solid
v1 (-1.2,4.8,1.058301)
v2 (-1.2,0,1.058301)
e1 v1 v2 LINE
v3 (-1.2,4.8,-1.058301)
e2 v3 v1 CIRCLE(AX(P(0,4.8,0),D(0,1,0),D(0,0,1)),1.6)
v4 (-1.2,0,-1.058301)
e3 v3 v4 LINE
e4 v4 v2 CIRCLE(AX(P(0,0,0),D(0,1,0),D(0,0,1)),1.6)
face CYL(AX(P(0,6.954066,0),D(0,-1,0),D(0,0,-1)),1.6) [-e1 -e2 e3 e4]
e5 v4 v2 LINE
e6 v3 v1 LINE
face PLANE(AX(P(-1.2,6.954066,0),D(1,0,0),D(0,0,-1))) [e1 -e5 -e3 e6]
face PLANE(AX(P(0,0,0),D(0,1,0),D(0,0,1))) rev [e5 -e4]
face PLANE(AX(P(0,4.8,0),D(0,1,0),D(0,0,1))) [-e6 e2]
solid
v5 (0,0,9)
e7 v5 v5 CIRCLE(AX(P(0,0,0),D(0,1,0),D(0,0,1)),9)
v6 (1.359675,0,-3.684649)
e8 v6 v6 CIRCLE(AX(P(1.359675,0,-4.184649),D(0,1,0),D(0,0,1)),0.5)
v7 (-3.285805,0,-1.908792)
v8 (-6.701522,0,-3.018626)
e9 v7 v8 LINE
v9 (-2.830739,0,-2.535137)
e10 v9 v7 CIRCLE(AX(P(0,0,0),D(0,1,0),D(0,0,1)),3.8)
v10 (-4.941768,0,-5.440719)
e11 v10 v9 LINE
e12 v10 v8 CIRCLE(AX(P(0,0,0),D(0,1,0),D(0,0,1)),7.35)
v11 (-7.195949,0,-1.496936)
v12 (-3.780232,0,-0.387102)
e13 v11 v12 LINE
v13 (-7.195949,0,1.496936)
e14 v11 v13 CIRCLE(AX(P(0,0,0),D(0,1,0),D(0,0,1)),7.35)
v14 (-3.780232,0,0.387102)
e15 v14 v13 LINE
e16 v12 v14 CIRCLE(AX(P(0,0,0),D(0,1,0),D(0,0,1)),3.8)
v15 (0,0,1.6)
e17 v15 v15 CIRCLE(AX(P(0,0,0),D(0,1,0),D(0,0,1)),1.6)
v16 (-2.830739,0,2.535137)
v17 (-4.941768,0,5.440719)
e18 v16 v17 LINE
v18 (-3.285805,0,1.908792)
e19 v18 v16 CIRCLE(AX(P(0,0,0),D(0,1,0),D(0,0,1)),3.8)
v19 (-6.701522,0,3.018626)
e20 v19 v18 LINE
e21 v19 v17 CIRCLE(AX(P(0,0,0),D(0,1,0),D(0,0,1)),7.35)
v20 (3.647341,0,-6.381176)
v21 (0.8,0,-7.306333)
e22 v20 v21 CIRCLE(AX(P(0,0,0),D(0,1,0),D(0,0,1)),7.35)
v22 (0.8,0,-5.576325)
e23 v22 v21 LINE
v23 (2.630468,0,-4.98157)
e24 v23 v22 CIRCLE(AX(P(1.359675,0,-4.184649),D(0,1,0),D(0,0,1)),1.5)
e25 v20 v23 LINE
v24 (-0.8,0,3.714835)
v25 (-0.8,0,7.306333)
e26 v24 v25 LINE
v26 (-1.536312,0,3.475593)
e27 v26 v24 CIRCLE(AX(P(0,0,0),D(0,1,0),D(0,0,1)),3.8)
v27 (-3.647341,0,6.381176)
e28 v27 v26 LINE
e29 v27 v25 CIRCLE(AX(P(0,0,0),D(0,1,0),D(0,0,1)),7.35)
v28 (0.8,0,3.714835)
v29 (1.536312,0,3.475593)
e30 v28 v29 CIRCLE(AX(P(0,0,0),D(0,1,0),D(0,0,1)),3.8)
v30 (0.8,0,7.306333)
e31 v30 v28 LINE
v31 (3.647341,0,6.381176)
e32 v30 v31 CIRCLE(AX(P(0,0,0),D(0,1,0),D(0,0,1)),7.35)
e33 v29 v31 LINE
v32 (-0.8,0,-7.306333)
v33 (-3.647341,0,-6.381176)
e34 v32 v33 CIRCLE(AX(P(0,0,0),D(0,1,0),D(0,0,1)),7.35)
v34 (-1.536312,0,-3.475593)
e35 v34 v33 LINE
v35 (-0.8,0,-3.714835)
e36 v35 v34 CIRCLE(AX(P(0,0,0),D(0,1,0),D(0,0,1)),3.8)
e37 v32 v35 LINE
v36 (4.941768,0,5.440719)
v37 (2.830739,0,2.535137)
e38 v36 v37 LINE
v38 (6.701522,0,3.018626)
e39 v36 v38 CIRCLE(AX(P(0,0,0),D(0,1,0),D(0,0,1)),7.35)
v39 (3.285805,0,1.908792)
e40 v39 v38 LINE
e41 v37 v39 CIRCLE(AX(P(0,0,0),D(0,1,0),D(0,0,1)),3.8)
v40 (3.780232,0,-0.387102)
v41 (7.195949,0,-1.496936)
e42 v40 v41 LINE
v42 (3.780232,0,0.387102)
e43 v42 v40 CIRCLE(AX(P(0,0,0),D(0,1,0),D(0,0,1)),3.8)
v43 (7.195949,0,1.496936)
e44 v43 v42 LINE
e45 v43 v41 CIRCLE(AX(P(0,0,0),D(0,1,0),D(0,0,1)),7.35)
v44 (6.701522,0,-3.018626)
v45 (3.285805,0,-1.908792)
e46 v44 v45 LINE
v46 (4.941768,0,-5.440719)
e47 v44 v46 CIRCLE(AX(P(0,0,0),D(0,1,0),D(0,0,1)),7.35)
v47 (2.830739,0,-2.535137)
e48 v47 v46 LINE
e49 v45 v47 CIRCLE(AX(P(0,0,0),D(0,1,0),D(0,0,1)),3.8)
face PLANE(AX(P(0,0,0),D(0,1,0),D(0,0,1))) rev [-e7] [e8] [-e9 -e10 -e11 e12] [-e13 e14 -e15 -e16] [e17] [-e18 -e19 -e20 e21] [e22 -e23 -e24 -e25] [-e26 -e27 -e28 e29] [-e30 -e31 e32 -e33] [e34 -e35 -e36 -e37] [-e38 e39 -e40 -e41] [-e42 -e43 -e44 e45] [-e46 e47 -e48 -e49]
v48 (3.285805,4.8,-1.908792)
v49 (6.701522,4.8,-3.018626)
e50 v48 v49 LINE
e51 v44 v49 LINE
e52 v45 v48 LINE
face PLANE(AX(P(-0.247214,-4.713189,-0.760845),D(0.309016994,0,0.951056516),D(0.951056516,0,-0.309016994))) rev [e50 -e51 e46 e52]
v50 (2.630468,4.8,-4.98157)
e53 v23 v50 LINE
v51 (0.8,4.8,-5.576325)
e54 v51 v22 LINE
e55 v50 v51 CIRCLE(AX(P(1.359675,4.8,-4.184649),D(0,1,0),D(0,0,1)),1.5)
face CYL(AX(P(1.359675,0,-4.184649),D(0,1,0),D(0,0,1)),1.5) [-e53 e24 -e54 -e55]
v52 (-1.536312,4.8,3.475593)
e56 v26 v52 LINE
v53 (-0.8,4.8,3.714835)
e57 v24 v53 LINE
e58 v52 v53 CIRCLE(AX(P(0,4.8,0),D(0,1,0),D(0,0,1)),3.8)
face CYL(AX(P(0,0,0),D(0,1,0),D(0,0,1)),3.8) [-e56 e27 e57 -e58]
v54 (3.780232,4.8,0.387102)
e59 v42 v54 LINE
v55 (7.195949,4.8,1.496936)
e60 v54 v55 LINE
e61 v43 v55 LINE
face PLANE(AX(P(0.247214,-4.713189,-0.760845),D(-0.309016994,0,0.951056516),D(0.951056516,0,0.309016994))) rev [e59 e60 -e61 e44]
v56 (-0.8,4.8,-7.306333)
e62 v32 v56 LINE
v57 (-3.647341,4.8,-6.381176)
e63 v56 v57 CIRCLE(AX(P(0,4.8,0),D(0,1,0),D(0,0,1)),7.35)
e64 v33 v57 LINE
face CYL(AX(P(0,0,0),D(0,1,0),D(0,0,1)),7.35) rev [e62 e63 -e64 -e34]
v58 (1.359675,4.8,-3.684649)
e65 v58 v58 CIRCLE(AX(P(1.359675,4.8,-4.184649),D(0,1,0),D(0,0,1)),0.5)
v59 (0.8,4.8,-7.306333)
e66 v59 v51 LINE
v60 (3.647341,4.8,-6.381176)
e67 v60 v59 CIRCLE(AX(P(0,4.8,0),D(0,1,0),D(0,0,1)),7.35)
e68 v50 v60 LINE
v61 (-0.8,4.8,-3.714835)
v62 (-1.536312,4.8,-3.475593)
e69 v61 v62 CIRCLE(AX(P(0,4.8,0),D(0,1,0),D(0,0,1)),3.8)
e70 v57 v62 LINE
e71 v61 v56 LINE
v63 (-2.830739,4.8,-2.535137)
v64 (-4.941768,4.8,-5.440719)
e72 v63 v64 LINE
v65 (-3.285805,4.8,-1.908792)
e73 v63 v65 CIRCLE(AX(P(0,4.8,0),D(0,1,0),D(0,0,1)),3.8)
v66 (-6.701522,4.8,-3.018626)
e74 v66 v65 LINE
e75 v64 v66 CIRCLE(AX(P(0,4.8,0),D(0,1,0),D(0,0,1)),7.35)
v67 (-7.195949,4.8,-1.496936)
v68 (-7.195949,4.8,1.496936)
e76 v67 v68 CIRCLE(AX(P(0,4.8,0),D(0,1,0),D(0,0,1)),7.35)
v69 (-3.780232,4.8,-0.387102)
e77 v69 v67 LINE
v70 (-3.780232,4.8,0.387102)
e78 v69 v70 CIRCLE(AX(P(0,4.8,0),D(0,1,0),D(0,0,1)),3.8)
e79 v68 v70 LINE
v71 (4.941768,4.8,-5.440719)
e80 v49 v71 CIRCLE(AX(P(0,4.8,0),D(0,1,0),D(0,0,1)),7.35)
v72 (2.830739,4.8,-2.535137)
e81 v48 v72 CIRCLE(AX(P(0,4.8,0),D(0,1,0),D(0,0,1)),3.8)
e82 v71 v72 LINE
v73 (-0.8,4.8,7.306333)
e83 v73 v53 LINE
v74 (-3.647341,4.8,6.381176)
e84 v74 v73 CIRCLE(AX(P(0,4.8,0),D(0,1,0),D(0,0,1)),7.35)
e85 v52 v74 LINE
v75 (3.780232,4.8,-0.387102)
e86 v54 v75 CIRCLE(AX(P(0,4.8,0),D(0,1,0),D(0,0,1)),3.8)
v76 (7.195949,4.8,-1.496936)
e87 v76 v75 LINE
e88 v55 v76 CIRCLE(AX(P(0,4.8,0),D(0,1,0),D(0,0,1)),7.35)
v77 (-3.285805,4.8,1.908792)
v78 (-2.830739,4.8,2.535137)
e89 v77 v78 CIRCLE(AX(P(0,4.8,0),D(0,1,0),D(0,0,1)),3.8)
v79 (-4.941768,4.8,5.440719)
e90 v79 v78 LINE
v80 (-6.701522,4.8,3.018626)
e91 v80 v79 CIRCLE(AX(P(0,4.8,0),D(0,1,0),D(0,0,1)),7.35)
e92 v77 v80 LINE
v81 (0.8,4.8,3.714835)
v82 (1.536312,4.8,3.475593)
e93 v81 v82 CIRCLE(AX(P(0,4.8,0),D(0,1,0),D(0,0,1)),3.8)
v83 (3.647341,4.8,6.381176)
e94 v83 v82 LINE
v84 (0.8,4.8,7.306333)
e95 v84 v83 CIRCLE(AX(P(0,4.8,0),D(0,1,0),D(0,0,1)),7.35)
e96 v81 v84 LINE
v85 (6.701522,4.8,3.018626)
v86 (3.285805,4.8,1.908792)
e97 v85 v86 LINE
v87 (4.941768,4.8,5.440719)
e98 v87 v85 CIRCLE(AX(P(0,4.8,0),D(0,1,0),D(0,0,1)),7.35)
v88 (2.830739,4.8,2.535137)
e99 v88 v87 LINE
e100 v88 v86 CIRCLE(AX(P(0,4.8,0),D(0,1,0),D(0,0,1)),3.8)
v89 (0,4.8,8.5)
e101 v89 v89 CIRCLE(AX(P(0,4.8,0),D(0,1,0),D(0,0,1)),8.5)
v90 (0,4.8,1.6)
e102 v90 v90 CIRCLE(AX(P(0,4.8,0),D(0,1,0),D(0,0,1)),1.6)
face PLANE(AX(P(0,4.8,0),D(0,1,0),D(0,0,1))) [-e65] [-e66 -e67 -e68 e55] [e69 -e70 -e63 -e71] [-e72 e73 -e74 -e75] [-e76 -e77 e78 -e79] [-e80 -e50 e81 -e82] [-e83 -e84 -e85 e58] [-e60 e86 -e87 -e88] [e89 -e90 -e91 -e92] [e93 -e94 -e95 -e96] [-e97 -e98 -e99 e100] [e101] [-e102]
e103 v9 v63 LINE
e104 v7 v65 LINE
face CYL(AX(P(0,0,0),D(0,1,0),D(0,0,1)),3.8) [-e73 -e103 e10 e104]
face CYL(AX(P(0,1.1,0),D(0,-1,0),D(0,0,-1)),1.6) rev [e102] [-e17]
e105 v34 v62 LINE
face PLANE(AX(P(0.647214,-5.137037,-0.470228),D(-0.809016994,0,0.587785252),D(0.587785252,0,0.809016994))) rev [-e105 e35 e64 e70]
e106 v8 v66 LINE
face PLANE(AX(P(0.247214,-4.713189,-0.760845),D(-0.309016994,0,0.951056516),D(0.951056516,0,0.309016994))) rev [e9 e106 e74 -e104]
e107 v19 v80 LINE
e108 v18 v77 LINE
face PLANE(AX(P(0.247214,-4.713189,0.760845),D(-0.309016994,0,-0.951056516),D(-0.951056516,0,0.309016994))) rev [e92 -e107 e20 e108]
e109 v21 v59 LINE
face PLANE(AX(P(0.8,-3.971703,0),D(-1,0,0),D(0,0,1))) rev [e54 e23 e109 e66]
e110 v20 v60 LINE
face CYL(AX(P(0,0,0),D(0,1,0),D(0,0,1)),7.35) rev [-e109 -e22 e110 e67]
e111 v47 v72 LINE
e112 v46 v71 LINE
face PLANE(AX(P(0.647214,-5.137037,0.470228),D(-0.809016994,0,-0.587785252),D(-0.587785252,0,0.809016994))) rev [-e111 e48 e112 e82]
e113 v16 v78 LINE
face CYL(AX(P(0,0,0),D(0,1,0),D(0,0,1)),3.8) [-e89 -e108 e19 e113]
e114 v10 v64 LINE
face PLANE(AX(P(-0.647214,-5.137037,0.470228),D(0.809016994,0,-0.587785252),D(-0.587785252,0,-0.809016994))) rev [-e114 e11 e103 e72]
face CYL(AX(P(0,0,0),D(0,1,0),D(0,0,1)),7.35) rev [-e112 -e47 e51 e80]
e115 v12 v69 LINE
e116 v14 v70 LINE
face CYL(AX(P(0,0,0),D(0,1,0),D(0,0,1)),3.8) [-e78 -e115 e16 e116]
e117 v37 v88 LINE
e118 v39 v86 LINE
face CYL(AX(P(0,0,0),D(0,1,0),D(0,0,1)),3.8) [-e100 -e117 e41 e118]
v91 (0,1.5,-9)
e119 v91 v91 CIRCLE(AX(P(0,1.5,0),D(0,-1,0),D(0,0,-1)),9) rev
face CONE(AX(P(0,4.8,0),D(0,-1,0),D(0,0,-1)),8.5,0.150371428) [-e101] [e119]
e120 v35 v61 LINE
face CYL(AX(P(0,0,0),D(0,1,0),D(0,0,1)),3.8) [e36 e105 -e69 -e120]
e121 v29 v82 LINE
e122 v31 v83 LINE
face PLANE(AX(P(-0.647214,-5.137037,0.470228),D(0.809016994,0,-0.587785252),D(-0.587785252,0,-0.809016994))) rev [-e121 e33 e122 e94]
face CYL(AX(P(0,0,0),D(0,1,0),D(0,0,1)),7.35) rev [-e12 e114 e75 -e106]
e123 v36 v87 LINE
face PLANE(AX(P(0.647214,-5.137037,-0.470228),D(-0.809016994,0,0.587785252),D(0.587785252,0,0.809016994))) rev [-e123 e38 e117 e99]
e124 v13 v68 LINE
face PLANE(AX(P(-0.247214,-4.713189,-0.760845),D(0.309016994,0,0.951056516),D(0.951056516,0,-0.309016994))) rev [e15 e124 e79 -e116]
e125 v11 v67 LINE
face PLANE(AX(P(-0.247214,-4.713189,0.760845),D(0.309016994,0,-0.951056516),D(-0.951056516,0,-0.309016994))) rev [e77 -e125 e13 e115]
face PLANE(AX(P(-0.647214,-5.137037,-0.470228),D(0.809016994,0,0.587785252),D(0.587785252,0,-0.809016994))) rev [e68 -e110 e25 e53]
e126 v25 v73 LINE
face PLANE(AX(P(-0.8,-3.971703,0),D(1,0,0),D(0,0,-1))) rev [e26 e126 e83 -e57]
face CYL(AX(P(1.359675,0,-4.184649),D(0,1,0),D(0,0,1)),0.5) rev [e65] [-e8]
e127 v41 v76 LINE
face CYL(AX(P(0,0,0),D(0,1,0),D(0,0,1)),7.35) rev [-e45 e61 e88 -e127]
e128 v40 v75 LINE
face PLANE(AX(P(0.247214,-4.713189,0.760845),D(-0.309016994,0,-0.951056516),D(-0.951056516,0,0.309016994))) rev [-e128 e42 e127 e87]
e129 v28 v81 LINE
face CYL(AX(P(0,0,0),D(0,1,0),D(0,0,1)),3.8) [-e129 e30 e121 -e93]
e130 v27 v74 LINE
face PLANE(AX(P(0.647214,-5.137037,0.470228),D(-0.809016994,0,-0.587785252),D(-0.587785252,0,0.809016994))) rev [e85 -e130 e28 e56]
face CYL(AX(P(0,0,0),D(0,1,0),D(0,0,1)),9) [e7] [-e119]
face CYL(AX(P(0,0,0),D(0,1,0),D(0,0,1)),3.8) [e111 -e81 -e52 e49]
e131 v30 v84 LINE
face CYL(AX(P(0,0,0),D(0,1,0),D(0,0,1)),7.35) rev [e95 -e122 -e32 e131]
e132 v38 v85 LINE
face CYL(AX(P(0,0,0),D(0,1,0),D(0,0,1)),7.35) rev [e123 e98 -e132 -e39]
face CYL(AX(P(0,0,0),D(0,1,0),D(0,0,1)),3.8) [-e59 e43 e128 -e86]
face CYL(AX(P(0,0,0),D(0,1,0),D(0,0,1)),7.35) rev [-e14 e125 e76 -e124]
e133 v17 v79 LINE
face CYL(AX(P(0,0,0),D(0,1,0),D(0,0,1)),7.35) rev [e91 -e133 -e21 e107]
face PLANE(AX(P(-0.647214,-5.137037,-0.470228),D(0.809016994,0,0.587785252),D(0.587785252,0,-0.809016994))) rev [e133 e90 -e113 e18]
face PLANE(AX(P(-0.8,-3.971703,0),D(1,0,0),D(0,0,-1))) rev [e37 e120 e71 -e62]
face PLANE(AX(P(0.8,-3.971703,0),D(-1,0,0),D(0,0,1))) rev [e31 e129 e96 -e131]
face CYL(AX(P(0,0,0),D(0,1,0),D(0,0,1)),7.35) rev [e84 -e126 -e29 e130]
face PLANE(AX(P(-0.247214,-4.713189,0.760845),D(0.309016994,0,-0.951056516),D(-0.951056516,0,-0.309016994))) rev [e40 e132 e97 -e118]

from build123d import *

# Parameters (mm, degrees)
SKETCH_4_R               = 11.6
SKETCH_4_R_2             = 1.6
EXTRUDE_1_DEPTH          = 1.1
EXTRUDE_START            = 1.5
SKETCH_4_3_R             = 9
SKETCH_4_3_R_2           = 1.6
EXTRUDE_2_DEPTH          = 3.3
CHAMFER_1_SIZE           = 0.2
SKETCH_4_4_R             = 1.6
CUT_EXTRUDE_2_DEPTH      = 18.092688495
CHAMFER_2_SIZE           = 0.5
CHAMFER_2_SIZE_2         = 3.3
CUT_EXTRUDE_4_DEPTH      = 18.092688495
EXTRUDE_3_DEPTH          = 4.8
PATTERN_CIRCULAR_2_COUNT = 10
SKETCH_6_R               = 1.5
EXTRUDE_4_DEPTH          = 4.8
SKETCH_6_3_R             = 0.5
CUT_EXTRUDE_5_DEPTH      = 18.092688495
EXTRUDE_5_DEPTH          = 4.8
SKETCH_7_OUTSIDE_W       = 31.832
SKETCH_7_OUTSIDE_H       = 31.832
SKETCH_7_OUTSIDE_R       = 9
CUT_EXTRUDE_6_DEPTH      = 18.092688495


with BuildPart() as part:
    # 草图4 → 凸台-拉伸1 (new body)
    with BuildSketch(Plane(origin=(0, 0, 0), x_dir=(1, 0, 0), z_dir=(0, 1, 0))):
        with Locations(Location((0, 0, 0), (0, 0, 270))):
            Circle(SKETCH_4_R)
        with Locations(Location((0, 0, 0), (0, 0, 270))):
            Circle(SKETCH_4_R_2, mode=Mode.SUBTRACT)
    extrude(amount=EXTRUDE_1_DEPTH)

    # 倒角1
    chamfer_1_edges = [part.edges().sort_by_distance(p)[0] for p in [
        (0, 1.1, -11.6),
    ]]
    chamfer(chamfer_1_edges, length=CHAMFER_1_SIZE)


with BuildPart() as body_2:
    # 草图4<3> → 凸台-拉伸2 (new body)
    with BuildSketch(Plane(origin=(0, 0, 0), x_dir=(1, 0, 0), z_dir=(0, 1, 0)).offset(EXTRUDE_START)):
        with Locations(Location((0, 0, 0), (0, 0, 270))):
            Circle(SKETCH_4_3_R)
        with Locations(Location((0, 0, 0), (0, 0, 270))):
            Circle(SKETCH_4_3_R_2, mode=Mode.SUBTRACT)
    extrude(amount=EXTRUDE_2_DEPTH)


    add(part.part)  # loft_1 joins it to this body
    # loft up to a face of the part (loft_1)
    loft([Face(Wire([body_2.edges().sort_by_distance((-6.560717647, 1.5, -6.160923953))[0]])), Face(Wire([body_2.edges().sort_by_distance((8.310242353, 1.1, -7.803837008))[0]]))])

    # 草图4<4> → 切除-拉伸2 (cut, through all)
    with BuildSketch(Plane(origin=(0, 0, 0), x_dir=(1, 0, 0), z_dir=(0, 1, 0))):
        with Locations(Location((0, 0, 0), (0, 0, 270))):
            Circle(SKETCH_4_4_R)
    extrude(amount=CUT_EXTRUDE_2_DEPTH, mode=Mode.SUBTRACT)

    # 倒角2
    # the kernel refuses this chamfer: 3.3, 0.5 mm, written as the material it takes off along each edge
    with BuildSketch(Plane(origin=(0, 4.8, 0), x_dir=(0, 0, 1), z_dir=(-1, 0, 0))) as chamfer_2_piece_1:
        Polygon((9 - CHAMFER_2_SIZE, 0), (9, -CHAMFER_2_SIZE_2), (9, 0), align=None)
    revolve(axis=Axis((0, 4.8, 0), (0, 1, 0)), mode=Mode.SUBTRACT)

    # 草图5 → 切除-拉伸4 (cut, through all)
    with BuildSketch(Plane(origin=(0, 4.8, 0), x_dir=(1, 0, 0), z_dir=(0, 1, 0))):
        with BuildLine():
            ThreePointArc((3.8, 0), (-2.387467277, -2.9563491), (-0.8, 3.714835124))
            Line((-0.8, 3.714835124), (-0.8, 7.30633287))
            ThreePointArc((-0.8, 7.30633287), (-4.906246019, -5.47277352), (7.35, 0))
            ThreePointArc((7.35, 0), (5.47277352, 4.906246019), (0.8, 7.30633287))
            Line((0.8, 7.30633287), (0.8, 3.714835124))
            ThreePointArc((0.8, 3.714835124), (2.9563491, 2.387467277), (3.8, 0))
        make_face()
        with BuildLine():
            Line((-0.8, 7.30633287), (-0.8, 3.714835124))
            ThreePointArc((-0.8, 3.714835124), (-0.402260194, 3.778648798), (0, 3.8))
            Line((0, 3.8), (0, 7.35))
            ThreePointArc((0, 7.35), (-0.400595438, 7.339075098), (-0.8, 7.30633287))
        make_face()
        with BuildLine():
            Line((0, 7.35), (0, 3.8))
            ThreePointArc((0, 3.8), (0.402260194, 3.778648798), (0.8, 3.714835124))
            Line((0.8, 3.714835124), (0.8, 7.30633287))
            ThreePointArc((0.8, 7.30633287), (0.400595438, 7.339075098), (0, 7.35))
        make_face()
    extrude(amount=-CUT_EXTRUDE_4_DEPTH, mode=Mode.SUBTRACT)


with BuildPart() as cut_extrude_4_piece_1:
    # of the separate pieces the step leaves, piece 1, a body of its own (cut_extrude_4_pieces)
    add(body_2.part.solids().sort_by_distance((0, 0.9, 11.6))[0])

    # 草图5<4> → 凸台-拉伸3 (add)
    with BuildSketch(Plane(origin=(0, 4.8, 0), x_dir=(1, 0, 0), z_dir=(0, 1, 0))):
        with BuildLine():
            Line((0, 7.35), (0, 3.8))
            ThreePointArc((0, 3.8), (0.402260194, 3.778648798), (0.8, 3.714835124))
            Line((0.8, 3.714835124), (0.8, 7.30633287))
            ThreePointArc((0.8, 7.30633287), (0.400595438, 7.339075098), (0, 7.35))
        make_face()
        with BuildLine():
            Line((-0.8, 7.30633287), (-0.8, 3.714835124))
            ThreePointArc((-0.8, 3.714835124), (-0.402260194, 3.778648798), (0, 3.8))
            Line((0, 3.8), (0, 7.35))
            ThreePointArc((0, 7.35), (-0.400595438, 7.339075098), (-0.8, 7.30633287))
        make_face()
    extrude_3 = extrude(amount=-EXTRUDE_3_DEPTH)

    # 阵列(圆周)2: 凸台-拉伸3 ×10 about axis
    pattern_circular_2_axis = Axis((0, 0, 0), (0, 1, 0))
    for i in range(1, PATTERN_CIRCULAR_2_COUNT):
        add(extrude_3.rotate(pattern_circular_2_axis, i * 360 / PATTERN_CIRCULAR_2_COUNT))



with BuildPart() as cut_extrude_4_piece_2:
    # of the separate pieces the step leaves, piece 2, a body of its own (cut_extrude_4_pieces)
    add(body_2.part.solids().sort_by_distance((-0.8, 0, -3.714835124))[0])


with BuildPart() as cut_extrude_4_piece_1_1:
    add(cut_extrude_4_piece_1.part)

    add(cut_extrude_4_piece_2.part)  # 凸台-拉伸4 merges 切除-拉伸4 piece 2
    # 草图6 → 凸台-拉伸4 (add, through all)
    with BuildSketch(Plane(origin=(0, 4.8, 0), x_dir=(1, 0, 0), z_dir=(0, 1, 0))):
        with Locations((1.359674775, 4.184648672)):
            Circle(SKETCH_6_R)
    extrude(amount=-EXTRUDE_4_DEPTH)

    # 草图6<3> → 切除-拉伸5 (cut, through all)
    with BuildSketch(Plane(origin=(0, 4.8, 0), x_dir=(1, 0, 0), z_dir=(0, 1, 0))):
        with Locations(Location((1.359674775, 4.184648672, 0), (0, 0, 270))):
            Circle(SKETCH_6_3_R)
    extrude(amount=-CUT_EXTRUDE_5_DEPTH, mode=Mode.SUBTRACT)

    # 草图7 outside → 切除-拉伸6 (cut, through all)
    with BuildSketch(Plane(origin=(0, 4.8, 0), x_dir=(1, 0, 0), z_dir=(0, 1, 0))):
        Rectangle(SKETCH_7_OUTSIDE_W, SKETCH_7_OUTSIDE_H)
        with Locations(Location((0, 0, 0), (0, 0, 270))):
            Circle(SKETCH_7_OUTSIDE_R, mode=Mode.SUBTRACT)
    extrude(amount=-CUT_EXTRUDE_6_DEPTH, mode=Mode.SUBTRACT)


with BuildPart() as body_2_2:
    # 草图4<6> → 凸台-拉伸5 (new body)
    with BuildSketch(Plane(origin=(0, 0, 0), x_dir=(1, 0, 0), z_dir=(0, 1, 0))):
        with BuildLine():
            Line((-1.2, -1.058300524), (-1.2, 1.058300524))
            ThreePointArc((-1.2, 1.058300524), (-1.6, 0), (-1.2, -1.058300524))
        make_face()
    extrude(amount=EXTRUDE_5_DEPTH)


solid = Compound([cut_extrude_4_piece_1_1.part, body_2_2.part])
